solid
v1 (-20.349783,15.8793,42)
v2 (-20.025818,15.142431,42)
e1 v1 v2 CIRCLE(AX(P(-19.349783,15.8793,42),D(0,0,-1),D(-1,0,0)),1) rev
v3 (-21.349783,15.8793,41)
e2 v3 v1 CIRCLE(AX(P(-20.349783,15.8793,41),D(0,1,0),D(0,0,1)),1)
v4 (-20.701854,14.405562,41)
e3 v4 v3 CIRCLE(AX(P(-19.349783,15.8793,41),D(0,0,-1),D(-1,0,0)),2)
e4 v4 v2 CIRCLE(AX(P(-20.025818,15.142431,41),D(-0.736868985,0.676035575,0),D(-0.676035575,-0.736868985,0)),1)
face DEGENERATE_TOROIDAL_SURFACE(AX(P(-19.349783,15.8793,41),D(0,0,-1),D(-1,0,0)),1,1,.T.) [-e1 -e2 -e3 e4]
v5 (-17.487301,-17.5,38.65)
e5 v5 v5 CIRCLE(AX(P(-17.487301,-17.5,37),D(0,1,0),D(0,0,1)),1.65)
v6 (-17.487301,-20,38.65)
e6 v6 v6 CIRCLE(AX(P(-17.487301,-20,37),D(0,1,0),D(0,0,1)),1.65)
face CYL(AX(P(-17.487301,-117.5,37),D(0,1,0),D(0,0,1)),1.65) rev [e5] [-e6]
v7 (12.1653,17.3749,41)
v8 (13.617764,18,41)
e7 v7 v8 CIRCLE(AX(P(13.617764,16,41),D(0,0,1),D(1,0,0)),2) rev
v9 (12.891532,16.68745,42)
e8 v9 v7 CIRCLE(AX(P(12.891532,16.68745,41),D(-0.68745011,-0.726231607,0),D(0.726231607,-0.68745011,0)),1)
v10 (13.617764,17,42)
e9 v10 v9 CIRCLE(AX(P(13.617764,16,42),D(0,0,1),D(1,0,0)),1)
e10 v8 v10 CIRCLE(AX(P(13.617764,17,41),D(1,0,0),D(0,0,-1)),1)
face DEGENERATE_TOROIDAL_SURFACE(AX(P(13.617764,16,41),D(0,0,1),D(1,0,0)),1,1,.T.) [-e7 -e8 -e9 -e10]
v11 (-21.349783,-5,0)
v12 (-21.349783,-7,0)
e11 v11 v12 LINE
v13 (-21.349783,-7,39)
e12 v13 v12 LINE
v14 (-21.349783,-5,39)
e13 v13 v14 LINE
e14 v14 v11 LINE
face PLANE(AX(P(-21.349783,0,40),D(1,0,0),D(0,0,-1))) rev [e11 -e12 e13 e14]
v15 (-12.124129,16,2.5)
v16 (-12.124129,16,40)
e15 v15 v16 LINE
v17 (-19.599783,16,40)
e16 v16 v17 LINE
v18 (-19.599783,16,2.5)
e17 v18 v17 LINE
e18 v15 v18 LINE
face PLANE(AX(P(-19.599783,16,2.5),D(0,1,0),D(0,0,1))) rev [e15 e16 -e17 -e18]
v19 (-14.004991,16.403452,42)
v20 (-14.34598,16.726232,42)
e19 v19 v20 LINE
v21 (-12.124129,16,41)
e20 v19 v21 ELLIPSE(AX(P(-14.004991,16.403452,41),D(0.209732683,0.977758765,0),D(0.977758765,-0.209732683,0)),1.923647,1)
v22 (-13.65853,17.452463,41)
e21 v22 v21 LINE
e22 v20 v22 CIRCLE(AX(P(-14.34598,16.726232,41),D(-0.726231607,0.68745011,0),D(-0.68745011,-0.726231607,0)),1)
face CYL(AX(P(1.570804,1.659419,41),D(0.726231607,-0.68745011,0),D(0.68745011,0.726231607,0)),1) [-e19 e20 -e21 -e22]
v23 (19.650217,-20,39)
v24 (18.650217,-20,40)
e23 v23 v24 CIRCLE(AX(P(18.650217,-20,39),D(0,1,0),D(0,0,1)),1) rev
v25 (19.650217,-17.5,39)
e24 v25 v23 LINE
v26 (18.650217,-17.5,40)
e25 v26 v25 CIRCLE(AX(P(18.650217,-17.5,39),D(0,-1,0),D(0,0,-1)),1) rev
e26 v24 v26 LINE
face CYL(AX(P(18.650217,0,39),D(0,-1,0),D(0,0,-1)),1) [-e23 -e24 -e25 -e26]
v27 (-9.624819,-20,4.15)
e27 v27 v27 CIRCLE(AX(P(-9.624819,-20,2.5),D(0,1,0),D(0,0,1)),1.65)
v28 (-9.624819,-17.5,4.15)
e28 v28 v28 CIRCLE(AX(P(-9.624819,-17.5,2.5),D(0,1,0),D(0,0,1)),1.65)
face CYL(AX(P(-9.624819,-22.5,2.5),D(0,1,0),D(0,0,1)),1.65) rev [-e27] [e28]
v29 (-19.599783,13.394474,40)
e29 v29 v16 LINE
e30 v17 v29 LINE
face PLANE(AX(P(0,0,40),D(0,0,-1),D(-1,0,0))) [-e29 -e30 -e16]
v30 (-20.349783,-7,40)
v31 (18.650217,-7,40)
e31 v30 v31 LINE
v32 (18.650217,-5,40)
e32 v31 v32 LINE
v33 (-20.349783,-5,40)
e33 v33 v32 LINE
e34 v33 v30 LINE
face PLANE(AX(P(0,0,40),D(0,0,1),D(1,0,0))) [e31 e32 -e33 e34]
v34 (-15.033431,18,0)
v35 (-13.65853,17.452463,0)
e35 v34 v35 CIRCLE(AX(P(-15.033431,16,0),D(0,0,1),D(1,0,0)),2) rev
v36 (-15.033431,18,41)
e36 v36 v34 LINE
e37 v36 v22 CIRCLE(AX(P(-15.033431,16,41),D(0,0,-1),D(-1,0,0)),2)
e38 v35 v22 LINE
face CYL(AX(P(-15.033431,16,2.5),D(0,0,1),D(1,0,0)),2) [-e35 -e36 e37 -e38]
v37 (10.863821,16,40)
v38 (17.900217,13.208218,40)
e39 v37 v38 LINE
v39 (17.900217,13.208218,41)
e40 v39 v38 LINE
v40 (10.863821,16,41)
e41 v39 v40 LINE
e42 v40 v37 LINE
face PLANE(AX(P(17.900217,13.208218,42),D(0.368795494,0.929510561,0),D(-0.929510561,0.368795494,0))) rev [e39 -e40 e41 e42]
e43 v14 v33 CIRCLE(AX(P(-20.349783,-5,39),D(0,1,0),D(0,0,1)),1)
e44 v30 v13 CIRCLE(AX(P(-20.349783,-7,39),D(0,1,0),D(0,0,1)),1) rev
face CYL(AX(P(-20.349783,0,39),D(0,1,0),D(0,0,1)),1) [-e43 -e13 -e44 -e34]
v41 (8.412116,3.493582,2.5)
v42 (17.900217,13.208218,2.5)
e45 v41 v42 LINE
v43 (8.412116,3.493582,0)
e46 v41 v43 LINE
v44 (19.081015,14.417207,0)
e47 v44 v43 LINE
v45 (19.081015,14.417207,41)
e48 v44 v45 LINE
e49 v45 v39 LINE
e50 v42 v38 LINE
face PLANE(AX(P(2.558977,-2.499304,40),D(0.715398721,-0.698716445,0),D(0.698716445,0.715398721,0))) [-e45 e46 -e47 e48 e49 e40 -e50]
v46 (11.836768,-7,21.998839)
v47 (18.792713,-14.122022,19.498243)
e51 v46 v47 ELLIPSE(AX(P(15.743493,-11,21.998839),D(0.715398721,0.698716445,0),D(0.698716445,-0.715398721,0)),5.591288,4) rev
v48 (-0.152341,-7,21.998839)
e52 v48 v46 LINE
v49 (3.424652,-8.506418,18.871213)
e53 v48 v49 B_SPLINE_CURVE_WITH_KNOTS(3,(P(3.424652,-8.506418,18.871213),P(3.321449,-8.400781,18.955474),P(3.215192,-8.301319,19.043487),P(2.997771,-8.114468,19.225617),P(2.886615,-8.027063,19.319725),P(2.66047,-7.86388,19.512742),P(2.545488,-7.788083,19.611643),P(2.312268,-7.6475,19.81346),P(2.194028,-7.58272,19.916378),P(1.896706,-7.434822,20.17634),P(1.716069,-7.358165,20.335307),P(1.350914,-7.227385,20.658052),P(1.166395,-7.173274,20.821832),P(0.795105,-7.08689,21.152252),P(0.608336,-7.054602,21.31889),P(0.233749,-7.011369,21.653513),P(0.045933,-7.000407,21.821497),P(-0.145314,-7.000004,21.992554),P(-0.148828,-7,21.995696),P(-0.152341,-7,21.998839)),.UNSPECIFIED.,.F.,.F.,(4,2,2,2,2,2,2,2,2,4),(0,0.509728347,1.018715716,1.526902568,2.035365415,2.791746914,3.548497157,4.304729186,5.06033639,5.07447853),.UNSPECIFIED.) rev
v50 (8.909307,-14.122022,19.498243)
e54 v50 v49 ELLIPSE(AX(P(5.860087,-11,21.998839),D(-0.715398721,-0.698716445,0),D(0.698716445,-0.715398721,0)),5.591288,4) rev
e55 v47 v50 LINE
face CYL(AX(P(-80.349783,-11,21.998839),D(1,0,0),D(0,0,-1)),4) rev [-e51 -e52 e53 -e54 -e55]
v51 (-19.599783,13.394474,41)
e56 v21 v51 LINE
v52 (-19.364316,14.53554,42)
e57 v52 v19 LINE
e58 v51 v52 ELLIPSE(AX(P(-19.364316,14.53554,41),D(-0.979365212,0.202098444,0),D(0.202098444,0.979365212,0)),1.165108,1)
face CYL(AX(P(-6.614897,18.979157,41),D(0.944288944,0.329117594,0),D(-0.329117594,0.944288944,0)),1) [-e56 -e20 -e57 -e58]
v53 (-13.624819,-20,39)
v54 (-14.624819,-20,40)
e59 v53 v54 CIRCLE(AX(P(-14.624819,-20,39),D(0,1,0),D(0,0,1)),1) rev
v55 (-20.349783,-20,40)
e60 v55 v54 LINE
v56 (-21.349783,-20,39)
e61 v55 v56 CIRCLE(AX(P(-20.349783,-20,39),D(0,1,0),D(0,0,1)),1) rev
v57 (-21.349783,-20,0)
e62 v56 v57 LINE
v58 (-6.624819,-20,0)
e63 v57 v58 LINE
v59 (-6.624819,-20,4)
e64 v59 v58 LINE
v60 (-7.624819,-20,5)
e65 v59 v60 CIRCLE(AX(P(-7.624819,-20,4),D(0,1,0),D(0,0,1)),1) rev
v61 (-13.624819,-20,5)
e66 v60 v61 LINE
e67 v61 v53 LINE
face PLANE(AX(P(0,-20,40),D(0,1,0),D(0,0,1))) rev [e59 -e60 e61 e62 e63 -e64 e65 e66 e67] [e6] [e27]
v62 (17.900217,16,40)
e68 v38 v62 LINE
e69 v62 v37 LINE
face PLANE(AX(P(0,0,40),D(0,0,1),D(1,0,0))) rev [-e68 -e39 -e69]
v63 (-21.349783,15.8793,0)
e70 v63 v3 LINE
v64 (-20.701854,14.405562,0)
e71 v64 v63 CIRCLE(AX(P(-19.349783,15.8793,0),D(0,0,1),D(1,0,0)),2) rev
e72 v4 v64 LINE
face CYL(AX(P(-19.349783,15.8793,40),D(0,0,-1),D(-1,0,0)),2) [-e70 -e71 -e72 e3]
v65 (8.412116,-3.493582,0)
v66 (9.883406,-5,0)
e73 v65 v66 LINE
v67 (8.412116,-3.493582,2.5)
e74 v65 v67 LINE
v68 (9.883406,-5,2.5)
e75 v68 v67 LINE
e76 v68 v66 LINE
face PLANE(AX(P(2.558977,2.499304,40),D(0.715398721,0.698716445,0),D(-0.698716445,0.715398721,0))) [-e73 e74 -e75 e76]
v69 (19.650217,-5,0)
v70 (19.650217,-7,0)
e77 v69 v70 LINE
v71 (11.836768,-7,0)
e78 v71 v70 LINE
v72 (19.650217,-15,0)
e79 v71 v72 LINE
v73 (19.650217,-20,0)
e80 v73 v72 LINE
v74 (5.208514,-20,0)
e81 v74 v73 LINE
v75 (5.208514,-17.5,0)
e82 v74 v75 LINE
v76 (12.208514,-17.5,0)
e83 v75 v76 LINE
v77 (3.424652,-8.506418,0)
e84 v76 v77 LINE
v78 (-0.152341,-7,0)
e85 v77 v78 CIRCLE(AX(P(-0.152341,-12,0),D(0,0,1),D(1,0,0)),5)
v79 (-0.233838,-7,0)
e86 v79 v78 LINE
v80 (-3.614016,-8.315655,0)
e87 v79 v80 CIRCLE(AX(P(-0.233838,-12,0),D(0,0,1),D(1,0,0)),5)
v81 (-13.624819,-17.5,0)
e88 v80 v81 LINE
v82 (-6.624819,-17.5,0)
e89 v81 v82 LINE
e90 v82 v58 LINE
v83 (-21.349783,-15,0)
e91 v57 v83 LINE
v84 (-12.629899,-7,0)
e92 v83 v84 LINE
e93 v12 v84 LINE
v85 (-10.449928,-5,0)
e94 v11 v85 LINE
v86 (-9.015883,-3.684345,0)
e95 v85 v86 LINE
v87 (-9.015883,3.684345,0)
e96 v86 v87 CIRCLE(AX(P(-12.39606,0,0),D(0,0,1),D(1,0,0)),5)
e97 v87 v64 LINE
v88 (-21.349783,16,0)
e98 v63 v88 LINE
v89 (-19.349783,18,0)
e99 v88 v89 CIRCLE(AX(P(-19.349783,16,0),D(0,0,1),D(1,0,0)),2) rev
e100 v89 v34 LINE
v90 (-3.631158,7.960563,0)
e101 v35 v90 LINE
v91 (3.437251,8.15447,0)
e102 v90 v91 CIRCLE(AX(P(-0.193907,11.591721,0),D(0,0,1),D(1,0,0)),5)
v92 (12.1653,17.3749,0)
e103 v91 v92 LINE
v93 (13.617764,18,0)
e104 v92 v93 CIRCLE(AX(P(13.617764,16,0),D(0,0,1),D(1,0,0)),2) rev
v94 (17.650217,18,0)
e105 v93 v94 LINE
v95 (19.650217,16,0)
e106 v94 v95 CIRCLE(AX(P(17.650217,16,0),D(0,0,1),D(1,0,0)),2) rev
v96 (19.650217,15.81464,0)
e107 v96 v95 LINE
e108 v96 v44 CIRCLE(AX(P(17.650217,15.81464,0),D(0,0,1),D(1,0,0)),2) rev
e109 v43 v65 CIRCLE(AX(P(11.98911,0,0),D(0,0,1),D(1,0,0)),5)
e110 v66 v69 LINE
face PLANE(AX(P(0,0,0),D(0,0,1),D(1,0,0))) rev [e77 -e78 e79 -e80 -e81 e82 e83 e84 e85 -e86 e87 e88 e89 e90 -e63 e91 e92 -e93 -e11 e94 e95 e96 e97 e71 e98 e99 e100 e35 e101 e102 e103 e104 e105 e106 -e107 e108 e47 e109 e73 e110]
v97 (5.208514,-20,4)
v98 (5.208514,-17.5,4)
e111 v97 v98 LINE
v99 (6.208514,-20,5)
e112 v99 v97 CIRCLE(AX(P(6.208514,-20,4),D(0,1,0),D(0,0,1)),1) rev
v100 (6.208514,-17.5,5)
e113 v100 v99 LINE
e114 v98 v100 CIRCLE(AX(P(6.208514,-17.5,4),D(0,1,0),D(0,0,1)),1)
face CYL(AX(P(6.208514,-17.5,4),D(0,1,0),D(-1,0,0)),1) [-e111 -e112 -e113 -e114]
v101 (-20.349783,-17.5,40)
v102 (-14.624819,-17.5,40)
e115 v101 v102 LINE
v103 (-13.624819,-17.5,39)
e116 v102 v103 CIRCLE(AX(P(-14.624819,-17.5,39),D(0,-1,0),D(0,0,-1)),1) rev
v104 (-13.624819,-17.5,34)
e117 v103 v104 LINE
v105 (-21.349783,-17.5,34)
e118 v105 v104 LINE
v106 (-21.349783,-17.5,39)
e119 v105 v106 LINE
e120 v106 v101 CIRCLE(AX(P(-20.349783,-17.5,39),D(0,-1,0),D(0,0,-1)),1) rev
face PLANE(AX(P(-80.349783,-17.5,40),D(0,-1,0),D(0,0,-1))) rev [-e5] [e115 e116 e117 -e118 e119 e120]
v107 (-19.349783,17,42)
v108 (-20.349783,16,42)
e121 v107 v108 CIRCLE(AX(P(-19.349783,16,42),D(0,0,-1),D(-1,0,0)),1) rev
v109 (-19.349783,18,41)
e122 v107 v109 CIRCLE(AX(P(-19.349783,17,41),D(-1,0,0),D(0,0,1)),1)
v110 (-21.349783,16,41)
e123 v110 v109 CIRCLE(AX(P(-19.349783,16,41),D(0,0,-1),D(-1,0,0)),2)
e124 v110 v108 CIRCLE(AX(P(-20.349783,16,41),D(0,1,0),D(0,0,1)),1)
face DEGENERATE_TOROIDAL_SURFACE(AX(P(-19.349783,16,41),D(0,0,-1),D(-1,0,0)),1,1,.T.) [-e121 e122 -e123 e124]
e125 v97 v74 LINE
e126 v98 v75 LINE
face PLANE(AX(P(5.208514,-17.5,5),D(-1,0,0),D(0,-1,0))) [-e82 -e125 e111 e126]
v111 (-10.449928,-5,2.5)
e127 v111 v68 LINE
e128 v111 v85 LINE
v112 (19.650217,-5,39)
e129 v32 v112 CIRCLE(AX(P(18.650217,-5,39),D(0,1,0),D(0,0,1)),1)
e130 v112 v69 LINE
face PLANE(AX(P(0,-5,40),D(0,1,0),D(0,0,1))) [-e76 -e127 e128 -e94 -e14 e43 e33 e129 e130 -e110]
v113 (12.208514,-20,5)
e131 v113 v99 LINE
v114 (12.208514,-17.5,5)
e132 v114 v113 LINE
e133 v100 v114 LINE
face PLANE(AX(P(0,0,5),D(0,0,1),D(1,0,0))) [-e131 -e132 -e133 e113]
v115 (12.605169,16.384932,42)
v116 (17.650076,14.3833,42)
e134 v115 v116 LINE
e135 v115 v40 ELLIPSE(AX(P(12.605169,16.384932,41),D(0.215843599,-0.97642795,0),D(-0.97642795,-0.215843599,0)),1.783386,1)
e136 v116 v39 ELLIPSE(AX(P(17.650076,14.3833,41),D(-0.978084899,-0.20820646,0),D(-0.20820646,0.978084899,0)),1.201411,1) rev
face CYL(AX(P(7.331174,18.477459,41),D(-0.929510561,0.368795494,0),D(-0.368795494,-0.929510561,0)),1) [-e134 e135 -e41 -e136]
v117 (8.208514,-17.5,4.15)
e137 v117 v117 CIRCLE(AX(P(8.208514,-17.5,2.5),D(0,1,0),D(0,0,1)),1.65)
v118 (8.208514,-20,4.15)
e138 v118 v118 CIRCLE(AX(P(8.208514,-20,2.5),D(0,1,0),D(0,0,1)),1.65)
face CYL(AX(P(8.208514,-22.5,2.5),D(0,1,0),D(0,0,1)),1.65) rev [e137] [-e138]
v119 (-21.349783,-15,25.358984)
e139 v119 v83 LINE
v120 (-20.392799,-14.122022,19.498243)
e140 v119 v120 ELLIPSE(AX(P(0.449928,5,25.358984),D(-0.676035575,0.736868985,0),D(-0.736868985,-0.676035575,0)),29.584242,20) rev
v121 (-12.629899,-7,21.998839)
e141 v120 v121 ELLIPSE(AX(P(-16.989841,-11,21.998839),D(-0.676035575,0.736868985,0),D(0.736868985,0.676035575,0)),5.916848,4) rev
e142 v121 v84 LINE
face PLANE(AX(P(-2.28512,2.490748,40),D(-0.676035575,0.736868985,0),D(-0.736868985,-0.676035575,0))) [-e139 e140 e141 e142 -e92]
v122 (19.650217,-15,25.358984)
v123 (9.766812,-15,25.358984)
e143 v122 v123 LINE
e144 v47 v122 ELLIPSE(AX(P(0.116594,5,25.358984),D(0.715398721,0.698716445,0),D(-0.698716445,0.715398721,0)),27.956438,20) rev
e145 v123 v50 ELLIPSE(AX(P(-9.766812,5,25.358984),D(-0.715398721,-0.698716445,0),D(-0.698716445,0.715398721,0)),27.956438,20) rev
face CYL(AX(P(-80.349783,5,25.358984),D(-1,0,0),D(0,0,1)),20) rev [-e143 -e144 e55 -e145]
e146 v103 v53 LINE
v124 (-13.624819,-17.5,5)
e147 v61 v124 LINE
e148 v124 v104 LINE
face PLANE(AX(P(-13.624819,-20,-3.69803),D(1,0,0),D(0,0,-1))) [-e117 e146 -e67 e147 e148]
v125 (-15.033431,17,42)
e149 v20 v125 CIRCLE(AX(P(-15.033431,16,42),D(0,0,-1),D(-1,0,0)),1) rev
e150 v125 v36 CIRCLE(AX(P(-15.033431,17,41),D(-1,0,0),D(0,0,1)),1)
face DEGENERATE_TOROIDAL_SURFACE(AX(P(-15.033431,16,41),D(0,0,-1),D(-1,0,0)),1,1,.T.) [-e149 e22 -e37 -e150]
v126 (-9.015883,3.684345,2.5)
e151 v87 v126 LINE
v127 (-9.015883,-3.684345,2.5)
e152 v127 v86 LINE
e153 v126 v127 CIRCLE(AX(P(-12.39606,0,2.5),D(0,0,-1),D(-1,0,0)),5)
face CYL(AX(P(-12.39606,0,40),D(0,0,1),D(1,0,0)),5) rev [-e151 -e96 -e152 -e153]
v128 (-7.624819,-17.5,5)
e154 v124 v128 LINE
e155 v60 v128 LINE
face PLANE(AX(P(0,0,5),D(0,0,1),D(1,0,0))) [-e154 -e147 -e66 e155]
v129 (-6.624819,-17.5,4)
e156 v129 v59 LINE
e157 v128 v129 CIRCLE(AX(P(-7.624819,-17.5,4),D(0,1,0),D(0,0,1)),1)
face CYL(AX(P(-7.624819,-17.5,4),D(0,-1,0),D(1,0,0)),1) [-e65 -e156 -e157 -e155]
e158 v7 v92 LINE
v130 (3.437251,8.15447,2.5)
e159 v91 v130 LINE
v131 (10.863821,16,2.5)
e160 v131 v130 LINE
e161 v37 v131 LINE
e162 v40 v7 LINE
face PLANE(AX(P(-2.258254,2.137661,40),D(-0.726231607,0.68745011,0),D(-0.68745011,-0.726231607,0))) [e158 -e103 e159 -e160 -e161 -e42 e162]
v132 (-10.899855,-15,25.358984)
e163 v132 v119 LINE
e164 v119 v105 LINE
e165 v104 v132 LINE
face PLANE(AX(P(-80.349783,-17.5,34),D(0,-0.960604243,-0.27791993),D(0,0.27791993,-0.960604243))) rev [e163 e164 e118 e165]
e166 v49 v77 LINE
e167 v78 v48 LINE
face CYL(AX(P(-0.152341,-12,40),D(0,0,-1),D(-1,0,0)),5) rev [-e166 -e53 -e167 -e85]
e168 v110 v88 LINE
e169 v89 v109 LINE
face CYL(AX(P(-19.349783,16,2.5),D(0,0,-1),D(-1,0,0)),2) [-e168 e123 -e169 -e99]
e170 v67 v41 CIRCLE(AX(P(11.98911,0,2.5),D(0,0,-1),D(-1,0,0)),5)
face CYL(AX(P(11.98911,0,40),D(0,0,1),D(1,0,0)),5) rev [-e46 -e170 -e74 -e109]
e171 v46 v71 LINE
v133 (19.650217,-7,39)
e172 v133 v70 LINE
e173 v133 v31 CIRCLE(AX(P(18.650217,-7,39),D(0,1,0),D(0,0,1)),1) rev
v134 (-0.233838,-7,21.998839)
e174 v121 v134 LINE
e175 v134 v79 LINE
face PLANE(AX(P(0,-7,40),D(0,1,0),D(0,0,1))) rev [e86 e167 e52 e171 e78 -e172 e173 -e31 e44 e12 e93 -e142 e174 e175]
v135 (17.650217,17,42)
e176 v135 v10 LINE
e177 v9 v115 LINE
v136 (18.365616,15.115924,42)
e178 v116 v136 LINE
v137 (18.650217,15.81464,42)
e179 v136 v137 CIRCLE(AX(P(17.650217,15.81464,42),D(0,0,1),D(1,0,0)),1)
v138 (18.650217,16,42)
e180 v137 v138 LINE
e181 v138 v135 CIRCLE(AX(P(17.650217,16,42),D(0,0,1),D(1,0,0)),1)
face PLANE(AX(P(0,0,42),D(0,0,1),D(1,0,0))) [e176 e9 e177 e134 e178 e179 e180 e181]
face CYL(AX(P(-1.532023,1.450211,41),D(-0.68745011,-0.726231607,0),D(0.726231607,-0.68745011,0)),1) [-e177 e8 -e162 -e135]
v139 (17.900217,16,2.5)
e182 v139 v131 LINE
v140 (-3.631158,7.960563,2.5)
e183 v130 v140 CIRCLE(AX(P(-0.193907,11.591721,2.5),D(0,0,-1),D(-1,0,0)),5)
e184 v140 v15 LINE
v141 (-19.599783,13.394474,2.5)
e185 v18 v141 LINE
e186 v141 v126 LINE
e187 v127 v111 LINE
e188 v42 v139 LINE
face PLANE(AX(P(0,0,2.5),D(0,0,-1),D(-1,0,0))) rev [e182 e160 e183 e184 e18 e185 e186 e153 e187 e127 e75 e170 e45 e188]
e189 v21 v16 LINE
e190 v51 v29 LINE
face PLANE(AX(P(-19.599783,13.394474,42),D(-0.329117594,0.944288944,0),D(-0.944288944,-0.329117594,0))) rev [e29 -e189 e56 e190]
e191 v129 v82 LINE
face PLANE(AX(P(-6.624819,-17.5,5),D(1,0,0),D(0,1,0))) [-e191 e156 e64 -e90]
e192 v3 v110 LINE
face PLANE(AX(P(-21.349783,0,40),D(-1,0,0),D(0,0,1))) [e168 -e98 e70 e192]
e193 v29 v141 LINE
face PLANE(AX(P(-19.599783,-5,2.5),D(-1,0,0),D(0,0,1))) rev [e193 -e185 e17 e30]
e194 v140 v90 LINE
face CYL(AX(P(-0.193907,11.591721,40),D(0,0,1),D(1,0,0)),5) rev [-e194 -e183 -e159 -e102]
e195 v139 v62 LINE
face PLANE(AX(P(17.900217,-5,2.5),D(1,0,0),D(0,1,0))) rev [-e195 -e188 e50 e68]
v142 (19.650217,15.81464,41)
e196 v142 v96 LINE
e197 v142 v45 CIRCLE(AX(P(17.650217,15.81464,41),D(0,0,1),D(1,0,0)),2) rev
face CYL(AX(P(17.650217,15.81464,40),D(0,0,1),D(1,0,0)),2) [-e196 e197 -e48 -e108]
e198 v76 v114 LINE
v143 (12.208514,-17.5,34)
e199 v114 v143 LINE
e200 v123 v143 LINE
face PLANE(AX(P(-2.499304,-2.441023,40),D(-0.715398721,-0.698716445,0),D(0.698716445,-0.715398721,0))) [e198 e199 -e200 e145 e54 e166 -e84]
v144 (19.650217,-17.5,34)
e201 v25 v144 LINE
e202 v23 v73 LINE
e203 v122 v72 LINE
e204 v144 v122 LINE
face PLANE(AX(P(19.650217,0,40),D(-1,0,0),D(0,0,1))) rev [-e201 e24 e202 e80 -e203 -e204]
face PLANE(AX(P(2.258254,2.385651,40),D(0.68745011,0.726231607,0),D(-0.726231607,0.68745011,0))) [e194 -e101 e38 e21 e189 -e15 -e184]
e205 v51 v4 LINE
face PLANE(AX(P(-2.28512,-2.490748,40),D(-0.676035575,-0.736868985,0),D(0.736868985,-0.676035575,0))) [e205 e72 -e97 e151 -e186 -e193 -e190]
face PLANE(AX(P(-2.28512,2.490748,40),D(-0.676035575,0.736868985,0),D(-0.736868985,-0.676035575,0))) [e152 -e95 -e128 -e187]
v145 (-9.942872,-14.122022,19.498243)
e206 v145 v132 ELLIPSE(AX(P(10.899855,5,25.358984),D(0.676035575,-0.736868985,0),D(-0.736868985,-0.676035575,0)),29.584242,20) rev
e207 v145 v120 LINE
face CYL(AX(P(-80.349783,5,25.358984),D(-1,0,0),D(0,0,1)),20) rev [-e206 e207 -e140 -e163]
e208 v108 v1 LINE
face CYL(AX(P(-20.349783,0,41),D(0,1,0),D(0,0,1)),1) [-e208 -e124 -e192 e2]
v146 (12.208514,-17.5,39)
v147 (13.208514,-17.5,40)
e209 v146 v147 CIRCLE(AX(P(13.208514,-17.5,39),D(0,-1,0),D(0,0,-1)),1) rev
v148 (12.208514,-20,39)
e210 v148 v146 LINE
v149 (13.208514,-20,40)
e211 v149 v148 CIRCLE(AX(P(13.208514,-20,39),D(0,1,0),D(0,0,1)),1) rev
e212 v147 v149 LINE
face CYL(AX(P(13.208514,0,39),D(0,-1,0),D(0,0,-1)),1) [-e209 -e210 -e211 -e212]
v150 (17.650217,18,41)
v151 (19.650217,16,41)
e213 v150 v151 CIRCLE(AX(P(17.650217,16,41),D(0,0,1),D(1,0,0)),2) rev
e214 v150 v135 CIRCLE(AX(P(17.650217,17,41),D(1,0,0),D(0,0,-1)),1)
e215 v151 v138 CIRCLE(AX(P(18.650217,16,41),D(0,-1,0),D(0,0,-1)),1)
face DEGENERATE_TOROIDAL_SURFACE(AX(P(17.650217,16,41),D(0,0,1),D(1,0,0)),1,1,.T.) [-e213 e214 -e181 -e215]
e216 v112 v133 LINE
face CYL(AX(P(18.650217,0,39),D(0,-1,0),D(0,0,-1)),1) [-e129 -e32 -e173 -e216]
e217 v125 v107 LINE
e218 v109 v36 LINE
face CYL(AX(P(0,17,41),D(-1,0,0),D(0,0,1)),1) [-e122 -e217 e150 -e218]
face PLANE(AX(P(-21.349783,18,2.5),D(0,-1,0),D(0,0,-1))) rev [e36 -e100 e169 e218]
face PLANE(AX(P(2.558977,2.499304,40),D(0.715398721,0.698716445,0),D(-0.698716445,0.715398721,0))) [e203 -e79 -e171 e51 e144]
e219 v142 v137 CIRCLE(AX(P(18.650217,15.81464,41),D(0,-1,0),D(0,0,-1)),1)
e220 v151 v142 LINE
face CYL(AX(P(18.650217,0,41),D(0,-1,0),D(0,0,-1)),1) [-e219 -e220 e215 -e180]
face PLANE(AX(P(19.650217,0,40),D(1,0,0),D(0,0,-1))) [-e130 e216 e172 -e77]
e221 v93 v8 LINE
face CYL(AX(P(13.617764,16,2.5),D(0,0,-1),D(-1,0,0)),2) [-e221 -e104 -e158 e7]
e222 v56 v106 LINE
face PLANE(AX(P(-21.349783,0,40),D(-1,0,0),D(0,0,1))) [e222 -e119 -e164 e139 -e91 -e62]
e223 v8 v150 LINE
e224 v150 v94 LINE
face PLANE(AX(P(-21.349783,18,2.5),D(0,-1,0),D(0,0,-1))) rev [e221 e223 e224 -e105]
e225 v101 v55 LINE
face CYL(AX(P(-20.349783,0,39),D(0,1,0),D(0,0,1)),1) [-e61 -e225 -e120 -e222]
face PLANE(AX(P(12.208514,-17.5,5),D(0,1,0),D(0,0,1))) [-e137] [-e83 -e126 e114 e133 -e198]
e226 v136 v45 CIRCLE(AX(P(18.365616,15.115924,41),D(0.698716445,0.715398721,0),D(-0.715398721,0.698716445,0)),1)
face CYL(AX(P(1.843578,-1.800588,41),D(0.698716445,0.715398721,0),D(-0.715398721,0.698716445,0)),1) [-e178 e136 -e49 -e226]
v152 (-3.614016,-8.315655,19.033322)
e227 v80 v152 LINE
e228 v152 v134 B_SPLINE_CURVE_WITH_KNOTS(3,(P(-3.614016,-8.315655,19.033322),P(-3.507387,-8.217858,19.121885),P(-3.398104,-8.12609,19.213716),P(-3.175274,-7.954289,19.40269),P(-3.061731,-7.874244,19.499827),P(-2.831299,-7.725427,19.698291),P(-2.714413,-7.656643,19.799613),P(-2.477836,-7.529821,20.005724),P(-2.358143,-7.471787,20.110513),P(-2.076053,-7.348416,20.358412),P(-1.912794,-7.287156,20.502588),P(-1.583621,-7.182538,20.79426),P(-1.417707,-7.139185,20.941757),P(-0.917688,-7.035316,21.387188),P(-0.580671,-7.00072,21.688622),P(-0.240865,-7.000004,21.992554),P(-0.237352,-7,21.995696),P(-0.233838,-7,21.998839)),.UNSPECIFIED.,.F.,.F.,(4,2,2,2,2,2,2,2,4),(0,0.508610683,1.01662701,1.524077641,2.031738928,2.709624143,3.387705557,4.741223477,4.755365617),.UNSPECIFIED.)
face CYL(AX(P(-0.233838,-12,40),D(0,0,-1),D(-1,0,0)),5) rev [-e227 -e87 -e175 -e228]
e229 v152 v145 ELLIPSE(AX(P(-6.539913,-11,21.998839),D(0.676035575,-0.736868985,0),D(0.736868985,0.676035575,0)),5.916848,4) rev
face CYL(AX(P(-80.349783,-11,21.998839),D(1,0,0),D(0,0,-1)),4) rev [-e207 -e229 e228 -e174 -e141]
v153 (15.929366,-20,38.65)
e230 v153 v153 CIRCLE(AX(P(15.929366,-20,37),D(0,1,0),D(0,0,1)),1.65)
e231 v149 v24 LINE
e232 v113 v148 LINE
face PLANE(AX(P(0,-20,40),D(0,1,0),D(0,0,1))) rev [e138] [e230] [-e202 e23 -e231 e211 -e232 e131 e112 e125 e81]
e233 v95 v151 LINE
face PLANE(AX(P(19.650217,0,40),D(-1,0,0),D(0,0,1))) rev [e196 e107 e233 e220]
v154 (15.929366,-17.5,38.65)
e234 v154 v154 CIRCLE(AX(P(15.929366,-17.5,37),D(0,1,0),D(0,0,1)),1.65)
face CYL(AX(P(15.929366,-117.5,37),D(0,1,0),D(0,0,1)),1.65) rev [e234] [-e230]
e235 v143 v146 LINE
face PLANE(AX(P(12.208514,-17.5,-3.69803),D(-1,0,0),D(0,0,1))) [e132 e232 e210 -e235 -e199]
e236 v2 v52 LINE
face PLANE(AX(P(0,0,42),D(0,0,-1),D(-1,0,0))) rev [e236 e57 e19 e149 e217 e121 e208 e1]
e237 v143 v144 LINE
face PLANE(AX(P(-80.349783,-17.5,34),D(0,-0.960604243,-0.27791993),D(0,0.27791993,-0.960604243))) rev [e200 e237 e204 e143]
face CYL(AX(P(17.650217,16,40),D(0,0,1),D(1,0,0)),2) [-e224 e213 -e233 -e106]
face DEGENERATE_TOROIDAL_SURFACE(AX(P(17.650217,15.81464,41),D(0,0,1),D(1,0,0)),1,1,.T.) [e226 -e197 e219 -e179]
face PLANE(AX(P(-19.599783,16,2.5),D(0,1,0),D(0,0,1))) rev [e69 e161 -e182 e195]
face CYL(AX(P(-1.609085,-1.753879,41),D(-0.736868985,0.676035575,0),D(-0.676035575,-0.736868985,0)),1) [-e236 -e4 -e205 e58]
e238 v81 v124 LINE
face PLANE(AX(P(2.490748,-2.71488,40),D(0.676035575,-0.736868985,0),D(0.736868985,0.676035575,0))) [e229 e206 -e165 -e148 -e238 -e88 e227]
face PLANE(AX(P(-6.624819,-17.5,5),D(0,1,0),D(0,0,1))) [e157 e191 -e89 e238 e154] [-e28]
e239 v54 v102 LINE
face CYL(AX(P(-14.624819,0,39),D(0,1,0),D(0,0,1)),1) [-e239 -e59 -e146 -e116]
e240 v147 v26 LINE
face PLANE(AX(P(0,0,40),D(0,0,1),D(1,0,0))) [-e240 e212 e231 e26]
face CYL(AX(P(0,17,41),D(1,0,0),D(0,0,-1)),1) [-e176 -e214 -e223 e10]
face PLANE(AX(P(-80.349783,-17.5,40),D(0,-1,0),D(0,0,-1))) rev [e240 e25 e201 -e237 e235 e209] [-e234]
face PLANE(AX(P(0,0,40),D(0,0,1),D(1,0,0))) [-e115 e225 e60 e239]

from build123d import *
from OCP.BRepFilletAPI import BRepFilletAPI_MakeChamfer

# Parameters (mm, degrees)
BOSS_EXTRUDE1_DEPTH = 40
SKETCH3_W           = 37.5
SKETCH3_H           = 21
SKETCH3_W_2         = 41
SKETCH3_H_2         = 2
CUT_EXTRUDE1_DEPTH  = 37.5
SKETCH4_W           = 50.283363854
SKETCH4_H           = 54.333359839
CUT_EXTRUDE2_DEPTH  = 37.5
BOSS_EXTRUDE2_DEPTH = 2
SKETCH6_W           = 30
SKETCH6_H           = 8
CUT_EXTRUDE3_DEPTH  = 100
CHAMFER1_SIZE       = 10
CHAMFER1_SIZE2      = 5.773502692
FILLET2_R           = 20
FILLET3_R           = 4
FILLET4_R           = 5
CUT_EXTRUDE4_DEPTH  = 100
BOSS_EXTRUDE3_REACH = 51.556
SKETCH9_R           = 1.65
CUT_EXTRUDE5_DEPTH  = 100
SKETCH10_W          = 7
SKETCH10_H          = 2.5
BOSS_EXTRUDE4_DEPTH = 5
SKETCH11_R          = 1.65
CUT_EXTRUDE6_DEPTH  = 5
FILLET5_R           = 1
FILLET6_R           = 1
FILLET7_R           = 2
FILLET8_R           = 1
FILLET9_R           = 1


with BuildPart() as part:
    # Sketch2 → Boss-Extrude1 (new body)
    with BuildSketch(Plane.XY):
        Polygon((-2.179971033, -7), (-16.349782749, -20), (-21.349782749, -20), (-21.349782749, -15), (-12.629898616, -7), (-21.349782749, -7), (-21.349782749, -5), (-10.449927583, -5), (-5, 0), (-21.349782749, 15), (-21.349782749, 20), (-16.349782749, 20), (0, 4.52331207), (14.650217251, 20), (19.650217251, 20), (19.650217251, 15), (5, 0), (9.88340575, -5), (19.650217251, -5), (19.650217251, -7), (11.83676805, -7), (19.650217251, -15), (19.650217251, -20), (14.650217251, -20), (1.9533623, -7), align=None)
    extrude(amount=BOSS_EXTRUDE1_DEPTH)

    # Sketch3 → Cut-Extrude1 (cut)
    with BuildSketch(Plane.XY.offset(40)):
        with Locations((-0.849782749, 5.5)):
            Rectangle(SKETCH3_W, SKETCH3_H)
        with Locations((-0.849782749, 19)):
            Rectangle(SKETCH3_W_2, SKETCH3_H_2)
    extrude(amount=-CUT_EXTRUDE1_DEPTH, mode=Mode.SUBTRACT)

    # Sketch4 → Cut-Extrude2 (cut)
    with BuildSketch(Plane(origin=(0, 18, 0), x_dir=(1, 0, 0), z_dir=(0, 1, 0))):
        with Locations((3.791899178, 24.66667992)):
            Rectangle(SKETCH4_W, SKETCH4_H)
    extrude(amount=CUT_EXTRUDE2_DEPTH, mode=Mode.SUBTRACT)

    # Sketch5 → Boss-Extrude2 (add)
    with BuildSketch(Plane.XY.offset(40)):
        Polygon((-21.349782749, 15), (-19.599782749, 13.394474079), (-12.124128572, 16), (-14.236955661, 18), (-21.349782749, 18), align=None)
        Polygon((10.863821268, 16), (12.75701926, 18), (19.650217251, 18), (19.650217251, 15), (17.900217251, 13.208217697), align=None)
    extrude(amount=BOSS_EXTRUDE2_DEPTH)

    # Sketch6 → Cut-Extrude3 (cut)
    with BuildSketch(Plane(origin=(19.650217251, 0, 0), x_dir=(0, 0, -1), z_dir=(1, 0, 0))):
        with Locations((-25, -11)):
            Rectangle(SKETCH6_W, SKETCH6_H)
    extrude(amount=-CUT_EXTRUDE3_DEPTH, mode=Mode.SUBTRACT)

    # Chamfer1: one chamfer whose edges measure the first distance from different faces: ONE call of the kernel's chamfer builder (chamfer() names one face for all edges)
    chamfer1_edges_1 = [part.edges().sort_by_distance(p)[0] for p in [
        (-16.124818958, -15, 10),
    ]]
    chamfer1_side_1 = [part.faces().sort_by_distance(p)[0] for p in [
        (-16.124818958, -15, 25),
    ]]
    chamfer1_edges_2 = [part.edges().sort_by_distance(p)[0] for p in [
        (14.708514376, -15, 10),
    ]]
    chamfer1_side_2 = [part.faces().sort_by_distance(p)[0] for p in [
        (14.708514376, -15, 25),
    ]]
    chamfer1 = BRepFilletAPI_MakeChamfer(part.part.solid().wrapped)
    for e in chamfer1_edges_1:
        chamfer1.Add(CHAMFER1_SIZE, CHAMFER1_SIZE2, e.wrapped, chamfer1_side_1[0].wrapped)  # the first distance lies on this face
    for e in chamfer1_edges_2:
        chamfer1.Add(CHAMFER1_SIZE, CHAMFER1_SIZE2, e.wrapped, chamfer1_side_2[0].wrapped)  # the first distance lies on this face
    add(Compound.cast(chamfer1.Shape()), mode=Mode.REPLACE)

    # Fillet2
    # the kernel refuses this fillet: 20 mm, written as the material it adds along each edge
    with BuildSketch(Plane(origin=(14.02999004, -9.226497308, 10), x_dir=(0, 1, 0), z_dir=(-1, 0, 0))) as fillet2_piece_1_section:
        with BuildLine():
            CenterArc((13.593145897, -16.455980671), FILLET2_R, 124.634022664, 25.365977336)
            Line((-3.727362178, -6.455980671), (0, 0))
            Line((0, 0), (2.226497308, 0))
        make_face()
    fillet2_piece_1 = extrude(amount=47.723549367, mode=Mode.PRIVATE)
    fillet2_piece_1 = split(fillet2_piece_1, bisect_by=Plane(origin=(14.020448108, -9.235816733, 10), z_dir=(-0.7153987205247665, -0.6987164451131282, 0)), keep=Keep.TOP, mode=Mode.PRIVATE)
    fillet2_piece_1 = split(fillet2_piece_1, bisect_by=Plane(origin=(8.962167208, -14.17614434, 10), z_dir=(0.7153987205247687, 0.6987164451131259, 0)), keep=Keep.TOP, mode=Mode.PRIVATE)
    add(fillet2_piece_1)
    with BuildSketch(Plane(origin=(14.02999004, -9.226497308, 10), x_dir=(0, 1, 0), z_dir=(-1, 0, 0))) as fillet2_piece_2_section:
        with BuildLine():
            CenterArc((13.593145897, -16.455980671), FILLET2_R, 124.634022664, 25.365977336)
            Line((-3.727362178, -6.455980671), (0, 0))
            Line((0, 0), (2.226497308, 0))
        make_face()
    fillet2_piece_2 = extrude(amount=47.723549367, mode=Mode.PRIVATE)
    fillet2_piece_2 = split(fillet2_piece_2, bisect_by=Plane(origin=(5.512518344, 0.057423479, 10), z_dir=(-0.6760355748646789, 0.7368689853137959, 0)), keep=Keep.TOP, mode=Mode.PRIVATE)
    fillet2_piece_2 = split(fillet2_piece_2, bisect_by=Plane(origin=(0.736649611, 5.263051227, 10), z_dir=(0.6760355748646789, -0.7368689853137959, 0)), keep=Keep.TOP, mode=Mode.PRIVATE)
    add(fillet2_piece_2)
    with BuildSketch(Plane(origin=(2.497604455, -15, 20), x_dir=(0, 0.5000000000000009, -0.866025403784438), z_dir=(-1, 0, 0))) as fillet2_piece_3_section:
        with BuildLine():
            CenterArc((FILLET2_R * 0.267949192431, -FILLET2_R), FILLET2_R, 90, 30)
            Line((-FILLET2_R * 0.232050807569, -FILLET2_R * 0.133974596216), (0, 0))
            Line((0, 0), (FILLET2_R * 0.267949192431, 0))
        make_face()
    fillet2_piece_3 = extrude(amount=37.244846826, mode=Mode.PRIVATE)
    fillet2_piece_3 = split(fillet2_piece_3, bisect_by=Plane(origin=(-3.62535745, -8.326060204, 20), z_dir=(-0.6760355748646789, 0.7368689853137959, 0)), keep=Keep.TOP, mode=Mode.PRIVATE)
    fillet2_piece_3 = split(fillet2_piece_3, bisect_by=Plane(origin=(-8.401226183, -3.120432456, 20), z_dir=(0.6760355748646789, -0.7368689853137959, 0)), keep=Keep.TOP, mode=Mode.PRIVATE)
    add(fillet2_piece_3)
    with BuildSketch(Plane(origin=(32.648156894, -9.226497308, 10), x_dir=(0, -0.5000000000000011, 0.8660254037844379), z_dir=(-1, 0, 0))) as fillet2_piece_4_section:
        with BuildLine():
            CenterArc((7.454724357, 20), FILLET2_R, 244.634022664, 25.365977336)
            Line((-1.113248654, 1.92820323), (0, 0))
            Line((0, 0), (7.454724357, 0))
        make_face()
    fillet2_piece_4 = extrude(amount=47.157027534, mode=Mode.PRIVATE)
    fillet2_piece_4 = split(fillet2_piece_4, bisect_by=Plane(origin=(23.109924126, -18.542309458, 10), z_dir=(-0.7153987205247665, -0.6987164451131282, 0)), keep=Keep.TOP, mode=Mode.PRIVATE)
    fillet2_piece_4 = split(fillet2_piece_4, bisect_by=Plane(origin=(18.051643225, -23.482637065, 10), z_dir=(0.7153987205247687, 0.6987164451131259, 0)), keep=Keep.TOP, mode=Mode.PRIVATE)
    add(fillet2_piece_4)
    with BuildSketch(Plane(origin=(32.648156894, -9.226497308, 10), x_dir=(0, -0.5000000000000011, 0.8660254037844379), z_dir=(-1, 0, 0))) as fillet2_piece_5_section:
        with BuildLine():
            CenterArc((7.454724357, 20), FILLET2_R, 244.634022664, 25.365977336)
            Line((-1.113248654, 1.92820323), (0, 0))
            Line((0, 0), (7.454724357, 0))
        make_face()
    fillet2_piece_5 = extrude(amount=47.157027534, mode=Mode.PRIVATE)
    fillet2_piece_5 = split(fillet2_piece_5, bisect_by=Plane(origin=(15.621734276, 9.332056745, 10), z_dir=(-0.6760355748646789, 0.7368689853137959, 0)), keep=Keep.TOP, mode=Mode.PRIVATE)
    fillet2_piece_5 = split(fillet2_piece_5, bisect_by=Plane(origin=(10.845865543, 14.537684493, 10), z_dir=(0.6760355748646789, -0.7368689853137959, 0)), keep=Keep.TOP, mode=Mode.PRIVATE)
    add(fillet2_piece_5)
    with BuildSketch(Plane(origin=(33.047676872, -15, 20), x_dir=(0, 0.5000000000000009, -0.866025403784438), z_dir=(-1, 0, 0))) as fillet2_piece_6_section:
        with BuildLine():
            CenterArc((FILLET2_R * 0.267949192431, -FILLET2_R), FILLET2_R, 90, 30)
            Line((-FILLET2_R * 0.232050807569, -FILLET2_R * 0.133974596216), (0, 0))
            Line((0, 0), (FILLET2_R * 0.267949192431, 0))
        make_face()
    fillet2_piece_6 = extrude(amount=36.678324993, mode=Mode.PRIVATE)
    fillet2_piece_6 = split(fillet2_piece_6, bisect_by=Plane(origin=(26.190919613, -21.696865566, 20), z_dir=(-0.7153987205247665, -0.6987164451131282, 0)), keep=Keep.TOP, mode=Mode.PRIVATE)
    fillet2_piece_6 = split(fillet2_piece_6, bisect_by=Plane(origin=(21.132638712, -26.637193173, 20), z_dir=(0.7153987205247687, 0.6987164451131259, 0)), keep=Keep.TOP, mode=Mode.PRIVATE)
    add(fillet2_piece_6)

    # Fillet3
    # the kernel refuses this fillet: 4 mm, written as the material it adds along each edge
    with BuildSketch(Plane(origin=(45.374542852, -7, 10), x_dir=(0, -0.5845395374156303, 0.8113652255291207), z_dir=(-1, 0, 0))) as fillet3_piece_1_section:
        with BuildLine():
            CenterArc((12.073598928, 3.768334945), FILLET3_R, 125.7704671, 163.825043137)
            Line((9.735440779, 7.013795847), (0, 0))
            ThreePointArc((0, 0), (6.70755496, -1.158325275), (13.41510992, 0))
        make_face()
    fillet3_piece_1 = extrude(amount=76.958955353, mode=Mode.PRIVATE)
    fillet3_piece_1 = split(fillet3_piece_1, bisect_by=Plane(origin=(23.151785451, -28.704548255, 10), z_dir=(0.7153987205249446, 0.6987164451129458, 0)), keep=Keep.TOP, mode=Mode.PRIVATE)
    fillet3_piece_1 = split(fillet3_piece_1, bisect_by=Plane(origin=(28.210066352, -23.764220648, 10), z_dir=(-0.7153987205249446, -0.6987164451129458, 0)), keep=Keep.TOP, mode=Mode.PRIVATE)
    add(fillet3_piece_1)
    with BuildSketch(Plane(origin=(45.374542852, -7, 10), x_dir=(0, -0.5845395374156303, 0.8113652255291207), z_dir=(-1, 0, 0))) as fillet3_piece_2_section:
        with BuildLine():
            CenterArc((12.073598928, 3.768334945), FILLET3_R, 125.7704671, 163.825043137)
            Line((9.735440779, 7.013795847), (0, 0))
            ThreePointArc((0, 0), (6.70755496, -1.158325275), (13.41510992, 0))
        make_face()
    fillet3_piece_2 = extrude(amount=76.958955353, mode=Mode.PRIVATE)
    fillet3_piece_2 = split(fillet3_piece_2, bisect_by=Plane(origin=(23.640984015, 16.689264357, 10), z_dir=(-0.6760355748647515, 0.7368689853137292, 0)), keep=Keep.TOP, mode=Mode.PRIVATE)
    fillet3_piece_2 = split(fillet3_piece_2, bisect_by=Plane(origin=(18.865115282, 21.894892105, 10), z_dir=(0.6760355748647515, -0.7368689853137292, 0)), keep=Keep.TOP, mode=Mode.PRIVATE)
    add(fillet3_piece_2)
    with BuildSketch(Plane(origin=(31.357803768, -7, 10), x_dir=(0, 0, 1), z_dir=(-1, 0, 0))) as fillet3_piece_3_section:
        with BuildLine():
            CenterArc((11.998839083, -4), FILLET3_R, 90, 163.825043137)
            ThreePointArc((10.884553686, -7.841662147), (4.765189923, -4.860655921), (0, 0))
            Line((0, 0), (11.998839083, 0))
        make_face()
    fillet3_piece_3 = extrude(amount=77.525477185, mode=Mode.PRIVATE)
    fillet3_piece_3 = split(fillet3_piece_3, bisect_by=Plane(origin=(16.308747963, -21.698129131, 10), z_dir=(0.7153987205249446, 0.6987164451129458, 0)), keep=Keep.TOP, mode=Mode.PRIVATE)
    fillet3_piece_3 = split(fillet3_piece_3, bisect_by=Plane(origin=(21.367028864, -16.757801523, 10), z_dir=(-0.7153987205249446, -0.6987164451129458, 0)), keep=Keep.TOP, mode=Mode.PRIVATE)
    add(fillet3_piece_3)
    with BuildSketch(Plane(origin=(31.357803768, -7, 10), x_dir=(0, 0, 1), z_dir=(-1, 0, 0))) as fillet3_piece_4_section:
        with BuildLine():
            CenterArc((11.998839083, -4), FILLET3_R, 90, 163.825043137)
            ThreePointArc((10.884553686, -7.841662147), (4.765189923, -4.860655921), (0, 0))
            Line((0, 0), (11.998839083, 0))
        make_face()
    fillet3_piece_4 = extrude(amount=77.525477185, mode=Mode.PRIVATE)
    fillet3_piece_4 = split(fillet3_piece_4, bisect_by=Plane(origin=(11.254363742, 14.912458463, 10), z_dir=(0.6760355748647515, -0.7368689853137292, 0)), keep=Keep.TOP, mode=Mode.PRIVATE)
    fillet3_piece_4 = split(fillet3_piece_4, bisect_by=Plane(origin=(16.030232474, 9.706830715, 10), z_dir=(-0.6760355748647515, 0.7368689853137292, 0)), keep=Keep.TOP, mode=Mode.PRIVATE)
    add(fillet3_piece_4)

    # Fillet4
    fillet4_edges = [part.edges().sort_by_distance(p)[0] for p in [
        (1.9533623, -7, 10.999419542),
        (-2.179971033, -7, 10.999419542),
        (0, 4.52331207, 1.25),
        (-5, 0, 1.25),
        (5, 0, 1.25),
    ]]
    fillet(fillet4_edges, radius=FILLET4_R)

    # Sketch7 → Cut-Extrude4 (cut)
    with BuildSketch(Plane(origin=(19.650217251, 0, 0), x_dir=(0, 0, -1), z_dir=(1, 0, 0))):
        Polygon((-40, -17.5), (-34, -17.5), (-25.358983849, -15), (-40, -15), align=None)
    extrude(amount=-CUT_EXTRUDE4_DEPTH, mode=Mode.SUBTRACT)

    # Boss-Extrude3: up to this face of the body (flat: up to its plane)
    boss_extrude3_end = Plane(part.part.faces().sort_by_distance((-0.697208097, -1.016556484, 0))[0])
    # Sketch8 → Boss-Extrude3 (add, up to the picked face)
    with BuildSketch(Plane.XY.offset(40), mode=Mode.PRIVATE) as boss_extrude3_sk1:
        Polygon((-13.624818958, -17.5), (-16.349782749, -20), (-13.624818958, -20), align=None)
    boss_extrude3_tool1 = split(extrude(boss_extrude3_sk1.sketch, amount=-BOSS_EXTRUDE3_REACH, mode=Mode.PRIVATE), bisect_by=boss_extrude3_end, keep=Keep.BOTH, mode=Mode.PRIVATE)
    # Sketch8 → Boss-Extrude3 (add, up to the picked face)
    with BuildSketch(Plane.XY.offset(40), mode=Mode.PRIVATE) as boss_extrude3_sk2:
        Polygon((14.650217251, -20), (12.208514376, -17.5), (12.208514376, -20), align=None)
    boss_extrude3_tool2 = split(extrude(boss_extrude3_sk2.sketch, amount=-BOSS_EXTRUDE3_REACH, mode=Mode.PRIVATE), bisect_by=boss_extrude3_end, keep=Keep.BOTH, mode=Mode.PRIVATE)
    add(boss_extrude3_tool1.solids().sort_by(Axis((-14.53314, -19.166667, 40), (0, 0, -1)))[0])
    add(boss_extrude3_tool2.solids().sort_by(Axis((13.022415, -19.166667, 40), (0, 0, -1)))[0])

    # Sketch9 → Cut-Extrude5 (cut)
    with BuildSketch(Plane(origin=(0, -17.5, 0), x_dir=(1, 0, 0), z_dir=(0, 1, 0))):
        with Locations(Location((-17.487300853, -37, 0), (0, 0, 270))):
            Circle(SKETCH9_R)
        with Locations(Location((15.929365813, -37, 0), (0, 0, 270))):
            Circle(SKETCH9_R)
    extrude(amount=-CUT_EXTRUDE5_DEPTH, mode=Mode.SUBTRACT)

    # Sketch10 → Boss-Extrude4 (add)
    with BuildSketch(Plane(origin=(0, 0, 0), x_dir=(-1, 0, 0), z_dir=(0, 0, -1))):
        with Locations((10.124818958, -18.75)):
            Rectangle(SKETCH10_W, SKETCH10_H)
        with Locations((-8.708514376, -18.75)):
            Rectangle(SKETCH10_W, SKETCH10_H)
    extrude(amount=-BOSS_EXTRUDE4_DEPTH)

    # Sketch11 → Cut-Extrude6 (cut)
    with BuildSketch(Plane(origin=(0, -17.5, 0), x_dir=(1, 0, 0), z_dir=(0, 1, 0))):
        with Locations(Location((8.208514376, -2.5, 0), (0, 0, 270))):
            Circle(SKETCH11_R)
        with Locations(Location((-9.624818958, -2.5, 0), (0, 0, 270))):
            Circle(SKETCH11_R)
    extrude(amount=-CUT_EXTRUDE6_DEPTH, mode=Mode.SUBTRACT)

    # Fillet5
    fillet5_edges = [part.edges().sort_by_distance(p)[0] for p in [
        (5.208514376, -18.75, 5),
        (-6.624818958, -18.75, 5),
    ]]
    fillet(fillet5_edges, radius=FILLET5_R)

    # Fillet6
    fillet6_edges = [part.edges().sort_by_distance(p)[0] for p in [
        (19.650217251, -6, 40),
        (-21.349782749, -6, 40),
    ]]
    fillet(fillet6_edges, radius=FILLET6_R)

    # Fillet7
    fillet7_edges = [part.edges().sort_by_distance(p)[0] for p in [
        (12.75701926, 18, 21),
        (-14.236955661, 18, 21),
        (19.650217251, 18, 21),
        (-21.349782749, 18, 21),
        (-21.349782749, 15, 21),
        (19.650217251, 15, 21),
    ]]
    fillet(fillet7_edges, radius=FILLET7_R)

    # Fillet8
    fillet8_edges = [part.edges().sort_by_distance(p)[0] for p in [
        (-15.861955661, 14.69723704, 42),
        (-12.891329478, 16.726231607, 42),
        (14.38201926, 14.604108849, 42),
        (18.490615971, 13.812712542, 42),
        (19.650217251, 15.907320139, 42),
        (15.63399045, 18, 42),
        (11.514560852, 16.68745011, 42),
        (12.827131129, 17.83709015, 42),
        (19.502458445, 15.060185137, 42),
        (19.064430813, 17.414213562, 42),
        (-20.150818324, 13.900018021, 42),
        (-21.349782749, 15.939649967, 42),
        (-17.191606676, 18, 42),
        (-20.763996311, 17.414213562, 42),
        (-14.293473316, 17.858080519, 42),
        (-21.180648978, 15.074359657, 42),
    ]]
    fillet(fillet8_edges, radius=FILLET8_R)

    # Fillet9
    fillet9_edges = [part.edges().sort_by_distance(p)[0] for p in [
        (19.650217251, -18.75, 40),
        (-13.624818958, -18.75, 40),
        (12.208514376, -18.75, 40),
        (-21.349782749, -18.75, 40),
    ]]
    fillet(fillet9_edges, radius=FILLET9_R)


solid = part.part
